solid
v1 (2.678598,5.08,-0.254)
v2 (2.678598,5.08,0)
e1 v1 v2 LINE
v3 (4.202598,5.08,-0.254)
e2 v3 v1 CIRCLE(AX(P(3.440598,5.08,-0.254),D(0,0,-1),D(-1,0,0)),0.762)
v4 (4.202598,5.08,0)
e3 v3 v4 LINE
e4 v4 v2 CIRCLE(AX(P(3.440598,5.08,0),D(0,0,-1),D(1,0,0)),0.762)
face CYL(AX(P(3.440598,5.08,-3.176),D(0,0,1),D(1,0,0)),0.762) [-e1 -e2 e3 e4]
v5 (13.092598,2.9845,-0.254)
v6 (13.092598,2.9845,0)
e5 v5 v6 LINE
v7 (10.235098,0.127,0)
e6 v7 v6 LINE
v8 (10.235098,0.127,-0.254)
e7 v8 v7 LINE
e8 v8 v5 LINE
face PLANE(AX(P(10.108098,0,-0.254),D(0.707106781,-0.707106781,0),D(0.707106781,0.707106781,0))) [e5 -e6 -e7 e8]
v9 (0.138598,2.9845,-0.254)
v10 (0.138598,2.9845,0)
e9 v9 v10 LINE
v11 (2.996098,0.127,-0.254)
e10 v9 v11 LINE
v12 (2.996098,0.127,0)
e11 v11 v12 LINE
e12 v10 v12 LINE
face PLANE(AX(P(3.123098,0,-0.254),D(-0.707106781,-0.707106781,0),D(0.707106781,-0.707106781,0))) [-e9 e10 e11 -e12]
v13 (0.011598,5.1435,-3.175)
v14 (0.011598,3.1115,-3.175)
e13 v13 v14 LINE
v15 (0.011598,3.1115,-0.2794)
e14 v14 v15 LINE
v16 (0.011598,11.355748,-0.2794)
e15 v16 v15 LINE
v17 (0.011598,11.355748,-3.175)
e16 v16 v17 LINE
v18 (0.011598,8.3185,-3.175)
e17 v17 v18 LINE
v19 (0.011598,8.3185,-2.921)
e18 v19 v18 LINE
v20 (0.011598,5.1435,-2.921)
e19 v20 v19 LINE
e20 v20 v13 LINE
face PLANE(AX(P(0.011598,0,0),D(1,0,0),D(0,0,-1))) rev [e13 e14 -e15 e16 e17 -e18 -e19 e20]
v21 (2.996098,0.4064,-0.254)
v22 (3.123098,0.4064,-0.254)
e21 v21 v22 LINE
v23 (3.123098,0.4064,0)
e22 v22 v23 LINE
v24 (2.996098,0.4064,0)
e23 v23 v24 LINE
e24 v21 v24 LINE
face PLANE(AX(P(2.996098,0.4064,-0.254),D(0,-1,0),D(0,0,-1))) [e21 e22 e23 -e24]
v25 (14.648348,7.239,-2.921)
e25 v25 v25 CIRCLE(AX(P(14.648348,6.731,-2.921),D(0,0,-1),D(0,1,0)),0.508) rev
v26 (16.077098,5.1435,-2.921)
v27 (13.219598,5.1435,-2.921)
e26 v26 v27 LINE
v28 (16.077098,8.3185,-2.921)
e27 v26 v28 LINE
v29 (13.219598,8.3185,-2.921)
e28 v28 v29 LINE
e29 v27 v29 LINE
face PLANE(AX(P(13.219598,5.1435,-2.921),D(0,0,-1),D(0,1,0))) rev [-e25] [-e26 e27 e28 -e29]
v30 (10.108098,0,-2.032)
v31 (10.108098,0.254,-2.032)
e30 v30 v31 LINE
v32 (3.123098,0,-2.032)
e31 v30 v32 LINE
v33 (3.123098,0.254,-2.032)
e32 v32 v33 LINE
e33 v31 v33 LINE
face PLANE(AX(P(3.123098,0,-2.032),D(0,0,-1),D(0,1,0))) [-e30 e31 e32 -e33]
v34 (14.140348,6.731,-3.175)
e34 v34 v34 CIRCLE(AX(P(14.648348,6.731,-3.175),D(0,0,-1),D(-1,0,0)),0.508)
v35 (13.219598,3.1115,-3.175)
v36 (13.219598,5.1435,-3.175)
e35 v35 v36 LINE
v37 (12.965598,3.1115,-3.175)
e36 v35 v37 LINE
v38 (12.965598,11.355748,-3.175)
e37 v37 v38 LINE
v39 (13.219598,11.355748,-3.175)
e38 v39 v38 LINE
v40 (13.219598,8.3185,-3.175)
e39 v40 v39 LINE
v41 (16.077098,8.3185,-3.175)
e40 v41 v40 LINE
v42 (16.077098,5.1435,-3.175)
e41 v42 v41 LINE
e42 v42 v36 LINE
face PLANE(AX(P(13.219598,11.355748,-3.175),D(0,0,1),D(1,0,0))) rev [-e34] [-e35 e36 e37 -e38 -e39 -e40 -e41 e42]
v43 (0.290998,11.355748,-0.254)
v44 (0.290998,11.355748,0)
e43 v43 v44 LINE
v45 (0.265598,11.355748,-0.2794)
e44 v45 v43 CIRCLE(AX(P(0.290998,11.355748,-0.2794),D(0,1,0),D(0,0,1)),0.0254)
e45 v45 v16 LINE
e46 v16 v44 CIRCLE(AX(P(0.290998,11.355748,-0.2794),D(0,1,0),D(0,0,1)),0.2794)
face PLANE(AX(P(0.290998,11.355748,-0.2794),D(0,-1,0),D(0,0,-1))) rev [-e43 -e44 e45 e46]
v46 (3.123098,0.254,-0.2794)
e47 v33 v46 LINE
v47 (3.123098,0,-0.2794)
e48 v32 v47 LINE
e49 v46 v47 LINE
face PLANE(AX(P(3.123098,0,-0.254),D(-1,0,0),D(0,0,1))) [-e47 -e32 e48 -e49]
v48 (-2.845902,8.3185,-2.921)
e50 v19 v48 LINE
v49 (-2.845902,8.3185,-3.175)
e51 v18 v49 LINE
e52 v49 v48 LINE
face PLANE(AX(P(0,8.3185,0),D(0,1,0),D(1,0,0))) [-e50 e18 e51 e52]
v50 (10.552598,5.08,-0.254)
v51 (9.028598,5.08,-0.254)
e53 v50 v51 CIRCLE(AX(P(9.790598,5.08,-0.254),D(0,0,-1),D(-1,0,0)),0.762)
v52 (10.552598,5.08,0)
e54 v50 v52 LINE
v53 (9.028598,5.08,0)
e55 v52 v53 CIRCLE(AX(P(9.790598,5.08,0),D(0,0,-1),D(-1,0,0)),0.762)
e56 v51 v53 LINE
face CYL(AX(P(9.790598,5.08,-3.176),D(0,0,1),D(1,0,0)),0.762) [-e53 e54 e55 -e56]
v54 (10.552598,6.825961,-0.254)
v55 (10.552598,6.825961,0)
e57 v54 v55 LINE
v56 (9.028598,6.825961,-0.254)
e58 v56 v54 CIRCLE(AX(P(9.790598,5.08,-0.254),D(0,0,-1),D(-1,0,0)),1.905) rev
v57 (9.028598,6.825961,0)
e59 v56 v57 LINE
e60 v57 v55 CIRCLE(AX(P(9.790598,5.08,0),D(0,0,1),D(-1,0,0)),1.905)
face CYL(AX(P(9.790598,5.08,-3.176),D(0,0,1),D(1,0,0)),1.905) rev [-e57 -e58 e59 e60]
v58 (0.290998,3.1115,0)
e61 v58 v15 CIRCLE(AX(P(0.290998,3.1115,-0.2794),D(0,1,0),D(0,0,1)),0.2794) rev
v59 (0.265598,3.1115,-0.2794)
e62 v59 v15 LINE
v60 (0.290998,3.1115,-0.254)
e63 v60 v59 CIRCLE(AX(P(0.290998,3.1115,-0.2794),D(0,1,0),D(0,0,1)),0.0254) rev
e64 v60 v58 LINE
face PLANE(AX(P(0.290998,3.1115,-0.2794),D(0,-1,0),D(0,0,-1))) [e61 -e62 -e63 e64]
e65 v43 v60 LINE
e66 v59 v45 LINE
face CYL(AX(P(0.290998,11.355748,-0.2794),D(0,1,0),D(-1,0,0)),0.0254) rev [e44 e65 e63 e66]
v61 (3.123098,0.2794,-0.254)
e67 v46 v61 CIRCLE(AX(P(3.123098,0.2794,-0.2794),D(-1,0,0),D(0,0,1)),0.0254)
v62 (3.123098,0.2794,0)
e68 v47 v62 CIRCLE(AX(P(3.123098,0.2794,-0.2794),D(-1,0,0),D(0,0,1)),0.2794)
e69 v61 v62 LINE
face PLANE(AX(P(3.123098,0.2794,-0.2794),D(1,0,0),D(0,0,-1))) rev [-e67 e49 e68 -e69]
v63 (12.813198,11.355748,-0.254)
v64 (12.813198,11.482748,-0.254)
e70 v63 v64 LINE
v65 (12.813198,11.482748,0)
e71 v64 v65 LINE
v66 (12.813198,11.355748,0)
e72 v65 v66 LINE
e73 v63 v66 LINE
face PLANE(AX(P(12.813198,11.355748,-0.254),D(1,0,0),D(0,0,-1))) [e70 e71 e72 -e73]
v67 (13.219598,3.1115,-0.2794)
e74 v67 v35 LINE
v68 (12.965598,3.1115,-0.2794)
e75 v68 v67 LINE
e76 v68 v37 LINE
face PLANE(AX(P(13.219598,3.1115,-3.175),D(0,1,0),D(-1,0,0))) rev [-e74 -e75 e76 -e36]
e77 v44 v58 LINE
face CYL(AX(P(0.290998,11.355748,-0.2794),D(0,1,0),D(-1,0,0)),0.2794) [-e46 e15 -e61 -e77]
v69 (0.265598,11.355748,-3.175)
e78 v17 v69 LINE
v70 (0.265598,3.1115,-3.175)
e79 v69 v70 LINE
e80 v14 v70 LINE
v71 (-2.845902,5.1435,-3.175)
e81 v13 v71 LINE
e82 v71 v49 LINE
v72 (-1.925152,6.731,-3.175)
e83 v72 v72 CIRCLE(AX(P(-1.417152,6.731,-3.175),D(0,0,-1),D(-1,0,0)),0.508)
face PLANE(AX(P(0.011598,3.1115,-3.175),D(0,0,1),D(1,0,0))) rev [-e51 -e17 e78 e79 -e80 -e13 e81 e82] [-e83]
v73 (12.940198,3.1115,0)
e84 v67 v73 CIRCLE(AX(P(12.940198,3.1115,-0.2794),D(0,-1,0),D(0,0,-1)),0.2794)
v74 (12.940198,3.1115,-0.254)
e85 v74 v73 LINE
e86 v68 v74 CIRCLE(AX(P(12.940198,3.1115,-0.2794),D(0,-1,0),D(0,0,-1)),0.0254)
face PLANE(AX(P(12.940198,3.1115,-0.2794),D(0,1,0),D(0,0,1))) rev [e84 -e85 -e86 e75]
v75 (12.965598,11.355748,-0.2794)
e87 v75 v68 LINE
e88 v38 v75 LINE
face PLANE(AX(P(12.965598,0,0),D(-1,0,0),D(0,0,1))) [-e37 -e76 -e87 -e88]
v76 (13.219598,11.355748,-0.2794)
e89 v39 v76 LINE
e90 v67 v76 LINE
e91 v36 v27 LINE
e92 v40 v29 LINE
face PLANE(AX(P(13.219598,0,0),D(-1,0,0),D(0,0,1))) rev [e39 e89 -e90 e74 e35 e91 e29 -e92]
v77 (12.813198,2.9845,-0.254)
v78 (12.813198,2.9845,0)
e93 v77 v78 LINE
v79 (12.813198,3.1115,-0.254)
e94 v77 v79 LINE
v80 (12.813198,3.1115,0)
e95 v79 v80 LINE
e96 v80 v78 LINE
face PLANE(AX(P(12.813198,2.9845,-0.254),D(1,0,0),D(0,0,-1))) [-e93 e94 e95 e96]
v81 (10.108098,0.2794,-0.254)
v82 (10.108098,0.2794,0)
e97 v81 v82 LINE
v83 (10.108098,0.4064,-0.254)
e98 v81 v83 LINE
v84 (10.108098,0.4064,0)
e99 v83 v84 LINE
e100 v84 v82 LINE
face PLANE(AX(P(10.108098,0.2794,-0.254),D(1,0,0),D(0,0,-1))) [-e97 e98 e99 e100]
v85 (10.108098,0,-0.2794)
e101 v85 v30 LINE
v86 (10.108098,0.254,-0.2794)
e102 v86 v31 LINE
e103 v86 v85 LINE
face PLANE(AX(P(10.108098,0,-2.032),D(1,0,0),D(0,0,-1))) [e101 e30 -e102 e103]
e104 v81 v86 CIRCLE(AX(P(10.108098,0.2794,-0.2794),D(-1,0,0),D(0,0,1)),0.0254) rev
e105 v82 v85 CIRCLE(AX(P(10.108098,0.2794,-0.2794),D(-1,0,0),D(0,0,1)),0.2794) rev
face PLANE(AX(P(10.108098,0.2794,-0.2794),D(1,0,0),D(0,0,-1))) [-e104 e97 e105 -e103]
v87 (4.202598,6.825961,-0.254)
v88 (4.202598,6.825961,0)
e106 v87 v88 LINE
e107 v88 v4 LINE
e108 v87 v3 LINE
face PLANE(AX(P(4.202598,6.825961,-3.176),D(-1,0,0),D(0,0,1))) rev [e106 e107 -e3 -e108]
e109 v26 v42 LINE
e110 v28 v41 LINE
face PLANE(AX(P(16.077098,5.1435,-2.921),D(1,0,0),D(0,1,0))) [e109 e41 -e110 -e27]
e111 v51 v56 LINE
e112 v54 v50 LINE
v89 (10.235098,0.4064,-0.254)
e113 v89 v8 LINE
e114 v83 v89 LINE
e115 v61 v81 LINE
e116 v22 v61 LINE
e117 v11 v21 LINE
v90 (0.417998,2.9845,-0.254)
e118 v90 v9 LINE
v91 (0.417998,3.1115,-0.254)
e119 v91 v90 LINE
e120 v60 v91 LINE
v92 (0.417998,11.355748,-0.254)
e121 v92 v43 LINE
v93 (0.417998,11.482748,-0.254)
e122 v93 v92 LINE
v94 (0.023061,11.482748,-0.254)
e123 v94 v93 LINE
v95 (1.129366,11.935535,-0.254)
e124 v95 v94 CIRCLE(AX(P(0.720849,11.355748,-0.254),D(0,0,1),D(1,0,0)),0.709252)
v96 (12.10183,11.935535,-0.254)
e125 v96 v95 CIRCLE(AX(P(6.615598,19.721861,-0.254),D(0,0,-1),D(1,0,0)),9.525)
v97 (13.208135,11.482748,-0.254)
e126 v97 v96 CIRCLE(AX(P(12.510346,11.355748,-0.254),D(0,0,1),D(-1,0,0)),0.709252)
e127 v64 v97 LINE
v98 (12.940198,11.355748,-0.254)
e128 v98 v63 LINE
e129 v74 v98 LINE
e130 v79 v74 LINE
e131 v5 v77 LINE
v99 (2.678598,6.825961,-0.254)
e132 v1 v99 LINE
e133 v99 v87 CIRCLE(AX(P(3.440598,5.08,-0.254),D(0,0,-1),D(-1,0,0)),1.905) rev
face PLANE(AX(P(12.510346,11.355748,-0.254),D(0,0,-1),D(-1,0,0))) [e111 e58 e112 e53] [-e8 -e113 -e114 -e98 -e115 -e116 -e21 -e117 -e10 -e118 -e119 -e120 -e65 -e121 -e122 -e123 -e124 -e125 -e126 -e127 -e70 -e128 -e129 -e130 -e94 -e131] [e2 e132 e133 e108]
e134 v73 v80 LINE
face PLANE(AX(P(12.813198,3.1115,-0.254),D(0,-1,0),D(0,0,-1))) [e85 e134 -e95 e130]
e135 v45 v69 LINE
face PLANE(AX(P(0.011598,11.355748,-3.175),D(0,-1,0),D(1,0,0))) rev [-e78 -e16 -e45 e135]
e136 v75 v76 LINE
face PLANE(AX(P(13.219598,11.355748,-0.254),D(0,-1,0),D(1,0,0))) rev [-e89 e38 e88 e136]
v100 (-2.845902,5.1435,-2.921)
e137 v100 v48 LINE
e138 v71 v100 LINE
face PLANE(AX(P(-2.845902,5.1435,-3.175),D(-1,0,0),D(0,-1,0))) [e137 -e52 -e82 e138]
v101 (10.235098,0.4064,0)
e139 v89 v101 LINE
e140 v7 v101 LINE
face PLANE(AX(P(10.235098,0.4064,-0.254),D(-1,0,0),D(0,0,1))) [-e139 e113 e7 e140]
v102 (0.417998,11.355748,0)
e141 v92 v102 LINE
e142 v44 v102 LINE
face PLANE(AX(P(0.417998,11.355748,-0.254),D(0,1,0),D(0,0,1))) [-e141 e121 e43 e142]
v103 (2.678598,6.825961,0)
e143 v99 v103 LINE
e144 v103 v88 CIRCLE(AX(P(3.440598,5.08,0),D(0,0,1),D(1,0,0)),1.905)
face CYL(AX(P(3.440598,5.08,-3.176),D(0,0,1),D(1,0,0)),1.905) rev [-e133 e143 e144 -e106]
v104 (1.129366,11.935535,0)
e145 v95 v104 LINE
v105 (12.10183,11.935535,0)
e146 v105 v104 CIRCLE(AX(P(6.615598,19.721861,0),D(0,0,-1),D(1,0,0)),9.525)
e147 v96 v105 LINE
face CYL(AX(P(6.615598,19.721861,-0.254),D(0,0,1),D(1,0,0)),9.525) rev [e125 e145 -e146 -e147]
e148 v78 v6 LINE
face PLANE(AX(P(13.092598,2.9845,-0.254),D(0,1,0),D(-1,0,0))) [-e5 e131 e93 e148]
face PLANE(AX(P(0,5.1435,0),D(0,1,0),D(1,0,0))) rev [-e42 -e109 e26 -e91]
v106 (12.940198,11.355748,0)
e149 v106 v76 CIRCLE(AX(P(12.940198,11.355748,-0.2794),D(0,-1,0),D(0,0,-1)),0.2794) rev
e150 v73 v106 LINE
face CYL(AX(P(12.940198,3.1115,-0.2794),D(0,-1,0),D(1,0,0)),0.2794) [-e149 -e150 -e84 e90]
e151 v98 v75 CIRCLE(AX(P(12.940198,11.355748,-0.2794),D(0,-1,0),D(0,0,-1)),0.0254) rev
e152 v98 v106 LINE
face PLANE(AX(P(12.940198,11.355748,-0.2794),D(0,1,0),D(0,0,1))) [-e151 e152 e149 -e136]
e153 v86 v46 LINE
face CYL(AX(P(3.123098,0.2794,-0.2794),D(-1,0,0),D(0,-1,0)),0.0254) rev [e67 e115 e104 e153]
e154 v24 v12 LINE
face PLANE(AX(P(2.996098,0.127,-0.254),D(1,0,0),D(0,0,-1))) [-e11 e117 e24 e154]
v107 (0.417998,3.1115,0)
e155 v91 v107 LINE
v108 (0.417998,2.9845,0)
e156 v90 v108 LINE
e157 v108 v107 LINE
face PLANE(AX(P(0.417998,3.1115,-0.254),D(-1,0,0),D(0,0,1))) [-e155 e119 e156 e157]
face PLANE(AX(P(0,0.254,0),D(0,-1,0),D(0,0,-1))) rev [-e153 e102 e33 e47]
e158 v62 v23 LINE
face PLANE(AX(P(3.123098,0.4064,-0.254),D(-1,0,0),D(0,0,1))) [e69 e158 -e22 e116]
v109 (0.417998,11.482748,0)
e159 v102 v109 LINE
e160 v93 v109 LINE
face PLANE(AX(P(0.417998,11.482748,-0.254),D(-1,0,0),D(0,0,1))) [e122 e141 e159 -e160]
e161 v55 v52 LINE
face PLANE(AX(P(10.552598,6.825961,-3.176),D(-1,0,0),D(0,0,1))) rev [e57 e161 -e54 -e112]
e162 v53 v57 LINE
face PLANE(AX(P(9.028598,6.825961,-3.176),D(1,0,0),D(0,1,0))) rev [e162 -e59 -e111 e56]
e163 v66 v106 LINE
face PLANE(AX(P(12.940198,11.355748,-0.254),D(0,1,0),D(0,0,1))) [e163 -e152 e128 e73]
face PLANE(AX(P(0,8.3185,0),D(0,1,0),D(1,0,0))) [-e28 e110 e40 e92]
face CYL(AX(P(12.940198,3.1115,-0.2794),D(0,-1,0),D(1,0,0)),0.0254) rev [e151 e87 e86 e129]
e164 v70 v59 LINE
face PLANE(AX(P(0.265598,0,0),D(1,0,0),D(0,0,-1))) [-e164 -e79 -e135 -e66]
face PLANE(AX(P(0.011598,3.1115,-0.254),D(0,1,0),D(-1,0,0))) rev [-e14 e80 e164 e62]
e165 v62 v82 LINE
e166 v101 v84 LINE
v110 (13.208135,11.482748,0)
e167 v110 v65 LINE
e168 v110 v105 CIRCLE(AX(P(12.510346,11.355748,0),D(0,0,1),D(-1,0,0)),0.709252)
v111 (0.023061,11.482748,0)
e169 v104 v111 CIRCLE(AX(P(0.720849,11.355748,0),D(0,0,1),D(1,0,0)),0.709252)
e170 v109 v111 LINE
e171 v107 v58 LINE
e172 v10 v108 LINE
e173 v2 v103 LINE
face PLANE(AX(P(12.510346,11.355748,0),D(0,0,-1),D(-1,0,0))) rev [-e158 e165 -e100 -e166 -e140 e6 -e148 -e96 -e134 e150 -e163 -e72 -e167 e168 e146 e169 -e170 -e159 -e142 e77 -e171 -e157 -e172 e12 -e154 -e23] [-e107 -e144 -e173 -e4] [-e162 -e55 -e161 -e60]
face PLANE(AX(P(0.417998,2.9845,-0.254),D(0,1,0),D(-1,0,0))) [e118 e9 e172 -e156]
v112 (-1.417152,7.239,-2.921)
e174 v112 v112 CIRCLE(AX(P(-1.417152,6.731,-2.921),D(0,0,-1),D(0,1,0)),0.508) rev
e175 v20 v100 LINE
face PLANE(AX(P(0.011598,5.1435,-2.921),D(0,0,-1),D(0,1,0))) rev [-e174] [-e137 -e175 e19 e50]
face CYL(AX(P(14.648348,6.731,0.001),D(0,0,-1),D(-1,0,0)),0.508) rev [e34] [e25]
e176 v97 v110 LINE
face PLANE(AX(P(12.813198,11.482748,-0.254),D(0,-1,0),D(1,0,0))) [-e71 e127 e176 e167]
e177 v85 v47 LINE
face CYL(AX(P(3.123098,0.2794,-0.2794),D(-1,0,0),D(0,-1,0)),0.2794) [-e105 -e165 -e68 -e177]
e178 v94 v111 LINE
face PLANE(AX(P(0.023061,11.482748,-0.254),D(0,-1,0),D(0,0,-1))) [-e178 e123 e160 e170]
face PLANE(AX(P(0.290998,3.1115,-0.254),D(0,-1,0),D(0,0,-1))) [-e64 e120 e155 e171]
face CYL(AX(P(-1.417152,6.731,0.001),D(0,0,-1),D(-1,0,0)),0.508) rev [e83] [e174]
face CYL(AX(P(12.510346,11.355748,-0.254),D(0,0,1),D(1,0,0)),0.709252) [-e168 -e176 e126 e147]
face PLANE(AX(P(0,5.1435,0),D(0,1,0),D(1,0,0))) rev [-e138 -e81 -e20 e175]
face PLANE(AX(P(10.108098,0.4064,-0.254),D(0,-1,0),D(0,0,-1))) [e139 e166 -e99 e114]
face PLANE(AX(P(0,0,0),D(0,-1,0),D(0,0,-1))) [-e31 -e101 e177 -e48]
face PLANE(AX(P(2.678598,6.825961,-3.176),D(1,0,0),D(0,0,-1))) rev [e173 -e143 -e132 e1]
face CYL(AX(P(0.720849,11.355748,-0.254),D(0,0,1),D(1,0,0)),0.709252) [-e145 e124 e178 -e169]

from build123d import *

# Parameters (mm, degrees)
BASE_FLANGE1_DEPTH              = 0.254
EDGE_FLANGE1_STRIP_W            = 1.0668
EDGE_FLANGE1_STRIP_H            = 0.254
EDGE_FLANGE1_STRIP_CUT_DEPTH    = 6.985
EDGE_FLANGE1_RELIEF_W           = 1.1938
EDGE_FLANGE1_RELIEF_H           = 0.127
EDGE_FLANGE1_RELIEF_CUT_DEPTH   = 0.254
EDGE_FLANGE1_DEPTH              = 6.985
EDGE_FLANGE2_STRIP_W            = 1.0668
EDGE_FLANGE2_STRIP_H            = 0.254
EDGE_FLANGE2_STRIP_CUT_DEPTH    = 8.244248495
EDGE_FLANGE2_RELIEF_W           = 1.1938
EDGE_FLANGE2_RELIEF_H           = 0.127
EDGE_FLANGE2_RELIEF_CUT_DEPTH   = 0.254
EDGE_FLANGE2_STRIP_2_W          = 1.0668
EDGE_FLANGE2_STRIP_2_H          = 0.254
EDGE_FLANGE2_STRIP_CUT_2_DEPTH  = 8.244248495
EDGE_FLANGE2_RELIEF_2_W         = 1.1938
EDGE_FLANGE2_RELIEF_2_H         = 0.127
EDGE_FLANGE2_RELIEF_CUT_2_DEPTH = 0.254
EDGE_FLANGE2_DEPTH              = 8.244248495
EDGE_FLANGE2_BEND_DEPTH         = 8.244248495
EXTRUDE_THIN1_START             = -1.5875
EXTRUDE_THIN1_OUTLINE_W         = 2.8575
EXTRUDE_THIN1_OUTLINE_H         = 0.254
EXTRUDE_THIN1_DEPTH             = 3.175
CUT_EXTRUDE1_REACH              = 22.35
CUT_EXTRUDE2_REACH              = 22.35
SKETCH23_R                      = 0.508


# Read off the part's stored shape, not the designer's step: Extrude-Thin1
# Sheet-metal steps are written as plain solids
with BuildPart() as part:
    # Sketch1 → Base-Flange1 (new body)
    with BuildSketch(Plane.XY):
        with BuildLine():
            Line((3.123097979, 0), (10.108097979, 0))
            Line((10.108097979, 0), (13.219597979, 3.1115))
            Line((13.219597979, 3.1115), (13.219597979, 11.355748495))
            ThreePointArc((13.219597979, 11.355748495), (12.836917178, 11.985343025), (12.101830107, 11.935534727))
            ThreePointArc((12.101830107, 11.935534727), (6.615597979, 10.196861335), (1.129365852, 11.935534727))
            ThreePointArc((1.129365852, 11.935534727), (0.39427878, 11.985343025), (0.011597979, 11.355748495))
            Line((0.011597979, 11.355748495), (0.011597979, 3.1115))
            Line((0.011597979, 3.1115), (3.123097979, 0))
        make_face()
    extrude(amount=-BASE_FLANGE1_DEPTH)

    # Edge-Flange1 strip (across the edge) → Edge-Flange1 strip cut (cut)
    with BuildSketch(Plane(origin=(10.108097979, 0, -0.254), x_dir=(0, 1, 0), z_dir=(-1, 0, 0))):
        with Locations((-0.254, -0.127)):
            Rectangle(EDGE_FLANGE1_STRIP_W, EDGE_FLANGE1_STRIP_H)
    extrude(amount=EDGE_FLANGE1_STRIP_CUT_DEPTH, mode=Mode.SUBTRACT)

    # Edge-Flange1 relief (on the sheet) → Edge-Flange1 relief cut (cut)
    with BuildSketch(Plane(origin=(10.108097979, 0.2794, -0.254), x_dir=(0, 1, 0), z_dir=(0, 0, -1))):
        with Locations((-0.4699, 0.0635)):
            Rectangle(EDGE_FLANGE1_RELIEF_W, EDGE_FLANGE1_RELIEF_H)
        with Locations((-0.4699, -7.0485)):
            Rectangle(EDGE_FLANGE1_RELIEF_W, EDGE_FLANGE1_RELIEF_H)
    extrude(amount=-EDGE_FLANGE1_RELIEF_CUT_DEPTH, mode=Mode.SUBTRACT)

    # Edge-Flange1 section (across the edge) → Edge-Flange1 (add)
    with BuildSketch(Plane(origin=(10.108097979, 0, -0.254), x_dir=(0, 1, 0), z_dir=(-1, 0, 0))):
        with BuildLine():
            Line((0, 0.0254), (0, 1.778))
            Line((0, 1.778), (0.254, 1.778))
            Line((0.254, 1.778), (0.254, 0.0254))
            ThreePointArc((0.254, 0.0254), (0.261439488, 0.007439488), (0.2794, 0))
            Line((0.2794, 0), (0.2794, -0.254))
            ThreePointArc((0.2794, -0.254), (0.081834365, -0.172165635), (0, 0.0254))
        make_face()
    extrude(amount=EDGE_FLANGE1_DEPTH)

    # Edge-Flange2 strip (across the edge) → Edge-Flange2 strip cut (cut)
    with BuildSketch(Plane(origin=(0.011597979, 3.1115, -0.254), x_dir=(1, 0, 0), z_dir=(0, 1, 0))):
        with Locations((-0.254, -0.127)):
            Rectangle(EDGE_FLANGE2_STRIP_W, EDGE_FLANGE2_STRIP_H)
    extrude(amount=EDGE_FLANGE2_STRIP_CUT_DEPTH, mode=Mode.SUBTRACT)

    # Edge-Flange2 relief (on the sheet) → Edge-Flange2 relief cut (cut)
    with BuildSketch(Plane(origin=(0.290997979, 3.1115, -0.254), x_dir=(1, 0, 0), z_dir=(0, 0, -1))):
        with Locations((-0.4699, 0.0635)):
            Rectangle(EDGE_FLANGE2_RELIEF_W, EDGE_FLANGE2_RELIEF_H)
        with Locations((-0.4699, -8.307748495)):
            Rectangle(EDGE_FLANGE2_RELIEF_W, EDGE_FLANGE2_RELIEF_H)
    extrude(amount=-EDGE_FLANGE2_RELIEF_CUT_DEPTH, mode=Mode.SUBTRACT)

    # Edge-Flange2 strip 2 (across the edge) → Edge-Flange2 strip cut 2 (cut)
    with BuildSketch(Plane(origin=(13.219597979, 11.355748495, -0.254), x_dir=(-1, 0, 0), z_dir=(0, -1, 0))):
        with Locations((-0.254, -0.127)):
            Rectangle(EDGE_FLANGE2_STRIP_2_W, EDGE_FLANGE2_STRIP_2_H)
    extrude(amount=EDGE_FLANGE2_STRIP_CUT_2_DEPTH, mode=Mode.SUBTRACT)

    # Edge-Flange2 relief 2 (on the sheet) → Edge-Flange2 relief cut 2 (cut)
    with BuildSketch(Plane(origin=(12.940197979, 11.355748495, -0.254), x_dir=(-1, 0, 0), z_dir=(0, 0, -1))):
        with Locations((-0.4699, 0.0635)):
            Rectangle(EDGE_FLANGE2_RELIEF_2_W, EDGE_FLANGE2_RELIEF_2_H)
        with Locations((-0.4699, -8.307748495)):
            Rectangle(EDGE_FLANGE2_RELIEF_2_W, EDGE_FLANGE2_RELIEF_2_H)
    extrude(amount=-EDGE_FLANGE2_RELIEF_CUT_2_DEPTH, mode=Mode.SUBTRACT)

    # Edge-Flange2 section (across the edge) → Edge-Flange2 (add)
    with BuildSketch(Plane(origin=(0.011597979, 3.1115, -0.254), x_dir=(1, 0, 0), z_dir=(0, 1, 0))):
        with BuildLine():
            Line((0, 0.0254), (0, 2.921))
            Line((0, 2.921), (0.254, 2.921))
            Line((0.254, 2.921), (0.254, 0.0254))
            ThreePointArc((0.254, 0.0254), (0.261439488, 0.007439488), (0.2794, 0))
            Line((0.2794, 0), (0.2794, -0.254))
            ThreePointArc((0.2794, -0.254), (0.081834365, -0.172165635), (0, 0.0254))
        make_face()
    extrude(amount=EDGE_FLANGE2_DEPTH)

    # Edge-Flange2 section 2 (across the edge) → Edge-Flange2 bend (add)
    with BuildSketch(Plane(origin=(13.219597979, 11.355748495, -0.254), x_dir=(-1, 0, 0), z_dir=(0, -1, 0))):
        with BuildLine():
            Line((0, 0.0254), (0, 2.921))
            Line((0, 2.921), (0.254, 2.921))
            Line((0.254, 2.921), (0.254, 0.0254))
            ThreePointArc((0.254, 0.0254), (0.261439488, 0.007439488), (0.2794, 0))
            Line((0.2794, 0), (0.2794, -0.254))
            ThreePointArc((0.2794, -0.254), (0.081834365, -0.172165635), (0, 0.0254))
        make_face()
    extrude(amount=EDGE_FLANGE2_BEND_DEPTH)

    # Extrude-Thin1 outline → Extrude-Thin1 (add)
    with BuildSketch(Plane(origin=(0, 6.731, 0), x_dir=(-1, 0, 0), z_dir=(0, -1, 0)).offset(EXTRUDE_THIN1_START)):
        with Locations((1.417152021, 3.048)):
            Rectangle(EXTRUDE_THIN1_OUTLINE_W, EXTRUDE_THIN1_OUTLINE_H)
        with Locations((-14.648347979, 3.048)):
            Rectangle(EXTRUDE_THIN1_OUTLINE_W, EXTRUDE_THIN1_OUTLINE_H)
    extrude(amount=EXTRUDE_THIN1_DEPTH)

    # Sketch20 → Cut-Extrude1 (cut, up to next)
    with BuildSketch(Plane.XY, mode=Mode.PRIVATE) as cut_extrude1_sk1:
        with BuildLine():
            Line((2.678597979, 6.82596134), (2.678597979, 5.08))
            ThreePointArc((2.678597979, 5.08), (3.440597979, 4.318), (4.202597979, 5.08))
            Line((4.202597979, 5.08), (4.202597979, 6.82596134))
            ThreePointArc((4.202597979, 6.82596134), (3.440597979, 3.175), (2.678597979, 6.82596134))
        make_face()
    cut_extrude1_tool1 = extrude(cut_extrude1_sk1.sketch, amount=-CUT_EXTRUDE1_REACH, mode=Mode.PRIVATE) & part.part
    # Sketch20 → Cut-Extrude1 (cut, up to next)
    with BuildSketch(Plane.XY, mode=Mode.PRIVATE) as cut_extrude1_sk2:
        with BuildLine():
            Line((9.028597979, 6.82596134), (9.028597979, 5.08))
            ThreePointArc((9.028597979, 5.08), (9.790597979, 4.318), (10.552597979, 5.08))
            Line((10.552597979, 5.08), (10.552597979, 6.82596134))
            ThreePointArc((10.552597979, 6.82596134), (9.790597979, 3.175), (9.028597979, 6.82596134))
        make_face()
    cut_extrude1_tool2 = extrude(cut_extrude1_sk2.sketch, amount=-CUT_EXTRUDE1_REACH, mode=Mode.PRIVATE) & part.part
    add(cut_extrude1_tool1.solids().sort_by_distance((2.625829, 5.952981, 0))[0], mode=Mode.SUBTRACT)
    add(cut_extrude1_tool2.solids().sort_by_distance((10.605367, 5.952981, 0))[0], mode=Mode.SUBTRACT)

    # Sketch23 → Cut-Extrude2 (cut, up to next)
    with BuildSketch(Plane(origin=(0, 0, -3.175), x_dir=(-1, 0, 0), z_dir=(0, 0, -1)), mode=Mode.PRIVATE) as cut_extrude2_sk1:
        with Locations((-14.648347979, 6.731)):
            Circle(SKETCH23_R)
    cut_extrude2_tool1 = extrude(cut_extrude2_sk1.sketch, amount=-CUT_EXTRUDE2_REACH, mode=Mode.PRIVATE) & part.part
    # Sketch23 → Cut-Extrude2 (cut, up to next)
    with BuildSketch(Plane(origin=(0, 0, -3.175), x_dir=(-1, 0, 0), z_dir=(0, 0, -1)), mode=Mode.PRIVATE) as cut_extrude2_sk2:
        with Locations((1.417152021, 6.731)):
            Circle(SKETCH23_R)
    cut_extrude2_tool2 = extrude(cut_extrude2_sk2.sketch, amount=-CUT_EXTRUDE2_REACH, mode=Mode.PRIVATE) & part.part
    add(cut_extrude2_tool1.solids().sort_by_distance((14.648348, 6.731, -3.175))[0], mode=Mode.SUBTRACT)
    add(cut_extrude2_tool2.solids().sort_by_distance((-1.417152, 6.731, -3.175))[0], mode=Mode.SUBTRACT)


solid = part.part
